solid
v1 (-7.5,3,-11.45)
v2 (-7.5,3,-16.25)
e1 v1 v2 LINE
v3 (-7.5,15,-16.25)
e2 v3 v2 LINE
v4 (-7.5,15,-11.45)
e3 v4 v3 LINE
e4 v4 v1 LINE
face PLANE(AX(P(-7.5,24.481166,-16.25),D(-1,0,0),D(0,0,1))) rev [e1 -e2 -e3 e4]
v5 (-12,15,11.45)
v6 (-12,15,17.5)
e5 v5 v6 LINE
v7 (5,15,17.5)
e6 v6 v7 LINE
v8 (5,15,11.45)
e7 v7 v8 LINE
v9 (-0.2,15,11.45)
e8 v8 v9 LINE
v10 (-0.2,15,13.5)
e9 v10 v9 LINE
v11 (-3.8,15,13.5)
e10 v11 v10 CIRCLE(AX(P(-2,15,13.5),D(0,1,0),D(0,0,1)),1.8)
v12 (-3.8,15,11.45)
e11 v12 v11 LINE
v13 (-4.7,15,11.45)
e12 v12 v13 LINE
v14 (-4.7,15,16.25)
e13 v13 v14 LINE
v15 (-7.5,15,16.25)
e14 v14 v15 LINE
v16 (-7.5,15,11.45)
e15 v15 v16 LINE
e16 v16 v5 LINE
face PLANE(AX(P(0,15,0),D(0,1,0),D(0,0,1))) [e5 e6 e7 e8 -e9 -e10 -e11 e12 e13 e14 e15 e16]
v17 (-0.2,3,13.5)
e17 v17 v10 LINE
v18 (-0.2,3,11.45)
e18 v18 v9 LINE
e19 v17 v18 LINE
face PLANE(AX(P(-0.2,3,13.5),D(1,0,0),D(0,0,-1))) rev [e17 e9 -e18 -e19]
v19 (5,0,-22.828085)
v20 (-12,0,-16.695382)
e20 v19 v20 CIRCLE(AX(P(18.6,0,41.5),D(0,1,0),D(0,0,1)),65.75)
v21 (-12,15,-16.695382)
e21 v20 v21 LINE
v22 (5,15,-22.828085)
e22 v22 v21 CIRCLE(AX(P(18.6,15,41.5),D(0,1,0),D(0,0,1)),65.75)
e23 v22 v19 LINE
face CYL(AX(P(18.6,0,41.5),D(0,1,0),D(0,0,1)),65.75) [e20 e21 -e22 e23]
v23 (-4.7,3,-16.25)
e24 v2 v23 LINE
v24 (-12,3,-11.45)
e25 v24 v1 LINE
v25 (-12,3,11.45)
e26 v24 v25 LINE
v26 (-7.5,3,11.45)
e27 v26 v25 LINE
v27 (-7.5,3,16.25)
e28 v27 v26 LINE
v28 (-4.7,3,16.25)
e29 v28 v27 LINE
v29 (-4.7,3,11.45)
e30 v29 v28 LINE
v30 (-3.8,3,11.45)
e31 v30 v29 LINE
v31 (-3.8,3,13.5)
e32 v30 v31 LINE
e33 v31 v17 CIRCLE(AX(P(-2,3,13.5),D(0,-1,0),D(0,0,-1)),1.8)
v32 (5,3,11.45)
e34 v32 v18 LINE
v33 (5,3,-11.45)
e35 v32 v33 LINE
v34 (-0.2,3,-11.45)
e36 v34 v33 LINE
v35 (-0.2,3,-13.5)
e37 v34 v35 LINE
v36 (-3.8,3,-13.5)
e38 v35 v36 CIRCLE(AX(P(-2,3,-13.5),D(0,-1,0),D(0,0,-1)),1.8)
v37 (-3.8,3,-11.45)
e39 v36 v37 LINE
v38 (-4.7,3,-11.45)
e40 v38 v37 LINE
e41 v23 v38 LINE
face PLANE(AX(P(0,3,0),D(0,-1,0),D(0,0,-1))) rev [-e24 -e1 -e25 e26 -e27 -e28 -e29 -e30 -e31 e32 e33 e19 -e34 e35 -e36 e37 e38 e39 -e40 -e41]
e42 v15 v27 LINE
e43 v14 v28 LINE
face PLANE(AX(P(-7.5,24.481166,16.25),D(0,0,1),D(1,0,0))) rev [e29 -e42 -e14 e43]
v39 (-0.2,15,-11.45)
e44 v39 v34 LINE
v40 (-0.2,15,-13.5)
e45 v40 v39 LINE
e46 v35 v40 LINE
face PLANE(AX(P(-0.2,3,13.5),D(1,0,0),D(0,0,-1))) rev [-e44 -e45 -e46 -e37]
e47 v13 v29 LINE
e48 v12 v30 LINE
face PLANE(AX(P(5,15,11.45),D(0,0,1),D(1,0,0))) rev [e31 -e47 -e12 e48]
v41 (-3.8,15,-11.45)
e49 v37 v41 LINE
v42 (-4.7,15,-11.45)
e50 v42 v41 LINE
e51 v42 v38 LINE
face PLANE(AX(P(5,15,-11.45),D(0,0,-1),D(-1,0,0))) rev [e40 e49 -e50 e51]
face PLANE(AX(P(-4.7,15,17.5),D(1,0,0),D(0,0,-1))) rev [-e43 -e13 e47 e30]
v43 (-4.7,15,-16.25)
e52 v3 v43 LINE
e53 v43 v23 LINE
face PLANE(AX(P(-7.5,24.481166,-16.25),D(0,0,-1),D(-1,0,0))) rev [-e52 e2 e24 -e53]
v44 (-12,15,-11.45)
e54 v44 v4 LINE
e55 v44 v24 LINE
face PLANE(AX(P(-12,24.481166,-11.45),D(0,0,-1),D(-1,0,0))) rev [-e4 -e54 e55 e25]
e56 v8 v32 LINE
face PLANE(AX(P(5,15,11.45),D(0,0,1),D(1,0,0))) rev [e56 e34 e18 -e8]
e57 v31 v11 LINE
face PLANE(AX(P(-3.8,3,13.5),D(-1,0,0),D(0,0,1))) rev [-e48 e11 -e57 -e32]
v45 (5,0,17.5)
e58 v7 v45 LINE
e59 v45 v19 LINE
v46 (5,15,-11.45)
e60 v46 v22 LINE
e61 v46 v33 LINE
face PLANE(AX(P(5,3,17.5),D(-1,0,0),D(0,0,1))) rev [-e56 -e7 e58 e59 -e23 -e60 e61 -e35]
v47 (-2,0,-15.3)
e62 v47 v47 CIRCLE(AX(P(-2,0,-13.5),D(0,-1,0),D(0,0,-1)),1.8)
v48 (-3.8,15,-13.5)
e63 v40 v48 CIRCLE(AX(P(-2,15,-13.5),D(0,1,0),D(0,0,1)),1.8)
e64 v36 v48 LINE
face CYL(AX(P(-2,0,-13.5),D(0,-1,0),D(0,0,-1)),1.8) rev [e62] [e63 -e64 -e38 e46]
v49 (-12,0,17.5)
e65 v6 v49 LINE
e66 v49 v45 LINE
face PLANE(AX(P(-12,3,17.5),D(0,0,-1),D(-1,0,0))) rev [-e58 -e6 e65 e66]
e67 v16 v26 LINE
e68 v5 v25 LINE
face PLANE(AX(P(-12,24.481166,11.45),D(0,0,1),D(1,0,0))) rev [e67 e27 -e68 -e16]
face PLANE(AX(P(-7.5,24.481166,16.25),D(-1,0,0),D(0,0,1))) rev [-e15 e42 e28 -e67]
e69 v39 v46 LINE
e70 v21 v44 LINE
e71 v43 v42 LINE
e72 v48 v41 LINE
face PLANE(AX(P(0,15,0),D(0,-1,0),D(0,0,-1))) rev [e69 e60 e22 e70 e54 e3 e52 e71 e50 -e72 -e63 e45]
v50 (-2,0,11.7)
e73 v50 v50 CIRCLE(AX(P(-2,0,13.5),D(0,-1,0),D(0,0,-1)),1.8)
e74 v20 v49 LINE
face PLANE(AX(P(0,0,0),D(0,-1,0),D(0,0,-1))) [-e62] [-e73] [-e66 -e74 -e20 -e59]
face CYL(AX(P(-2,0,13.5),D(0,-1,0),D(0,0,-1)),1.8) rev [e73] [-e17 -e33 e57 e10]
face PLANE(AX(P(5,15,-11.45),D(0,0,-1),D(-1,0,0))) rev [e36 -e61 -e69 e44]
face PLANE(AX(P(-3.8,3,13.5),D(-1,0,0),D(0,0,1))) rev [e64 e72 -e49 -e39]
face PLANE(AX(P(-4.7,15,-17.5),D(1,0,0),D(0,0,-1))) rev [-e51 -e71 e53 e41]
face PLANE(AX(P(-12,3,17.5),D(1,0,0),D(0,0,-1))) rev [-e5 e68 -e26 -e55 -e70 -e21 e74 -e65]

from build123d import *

# Parameters (mm, degrees)
SKETCH1_W            = 17
SKETCH1_H            = 35
BOSS_EXTRUDE1_DEPTH  = 3
M3_CLEARANCE_HOLE1_D = 3.6
SKETCH5_W            = 9.7
SKETCH5_H            = 6.05
BOSS_EXTRUDE2_DEPTH  = 12
CUT_EXTRUDE1_DEPTH   = 12
BOSS_EXTRUDE3_DEPTH  = 12
SKETCH8_W            = 17
SKETCH8_H            = 15
BOSS_EXTRUDE4_DEPTH  = 30
CUT_EXTRUDE2_START   = -15
CUT_EXTRUDE2_DEPTH   = 15


# Read off the part's stored shape, not the designer's step: Cut-Extrude2
with BuildPart() as part:
    # Sketch1 → Boss-Extrude1 (new body)
    with BuildSketch(Plane(origin=(0, 0, 0), x_dir=(1, 0, 0), z_dir=(0, 1, 0))):
        with Locations((-3.5, 0)):
            Rectangle(SKETCH1_W, SKETCH1_H)
    extrude(amount=BOSS_EXTRUDE1_DEPTH)

    # M3 Clearance Hole1 (through all)
    with Locations(Plane(origin=(0, 0, 0), x_dir=(-1, 0, 0), z_dir=(0, -1, 0))):
        with Locations((2, 13.5), (2, -13.5)):
            Hole(M3_CLEARANCE_HOLE1_D / 2)

    # Sketch5 → Boss-Extrude2 (add)
    with BuildSketch(Plane(origin=(0, 3, 0), x_dir=(1, 0, 0), z_dir=(0, 1, 0))):
        with Locations((0.15, -14.475)):
            Rectangle(SKETCH5_W, SKETCH5_H)
        with Locations((0.15, 14.475)):
            Rectangle(SKETCH5_W, SKETCH5_H)
    extrude(amount=BOSS_EXTRUDE2_DEPTH)

    # Sketch6 → Cut-Extrude1 (cut)
    with BuildSketch(Plane(origin=(0, 15, 0), x_dir=(1, 0, 0), z_dir=(0, 1, 0))):
        with BuildLine():
            Line((-3.8, -13.5), (-3.8, 13.5))
            ThreePointArc((-3.8, 13.5), (-2, 15.3), (-0.2, 13.5))
            Line((-0.2, 13.5), (-0.2, -13.5))
            ThreePointArc((-0.2, -13.5), (-2, -15.3), (-3.8, -13.5))
        make_face()
    extrude(amount=-CUT_EXTRUDE1_DEPTH, mode=Mode.SUBTRACT)

    # Sketch7 → Boss-Extrude3 (add)
    with BuildSketch(Plane(origin=(0, 3, 0), x_dir=(1, 0, 0), z_dir=(0, 1, 0))):
        Polygon((-12, -17.5), (-4.7, -17.5), (-4.7, -16.25), (-7.5, -16.25), (-7.5, -11.45), (-12, -11.45), align=None)
        Polygon((-12, 17.5), (-4.7, 17.5), (-4.7, 16.25), (-7.5, 16.25), (-7.5, 11.45), (-12, 11.45), align=None)
    extrude(amount=BOSS_EXTRUDE3_DEPTH)

    # Sketch8 → Boss-Extrude4 (add)
    with BuildSketch(Plane(origin=(0, 0, -17.5), x_dir=(-1, 0, 0), z_dir=(0, 0, -1))):
        with Locations((3.5, 7.5)):
            Rectangle(SKETCH8_W, SKETCH8_H)
    extrude(amount=BOSS_EXTRUDE4_DEPTH)

    # Cut-Extrude2 outline → Cut-Extrude2 (cut)
    with BuildSketch(Plane(origin=(0, 15, 0), x_dir=(1, 0, 0), z_dir=(0, 1, 0)).offset(CUT_EXTRUDE2_START)):
        with BuildLine():
            ThreePointArc((-12, 16.695382119), (-3.71171241, 20.348605395), (5, 22.828084846))
            Line((5, 22.828084846), (5, 47.5))
            Line((5, 47.5), (-12, 47.5))
            Line((-12, 47.5), (-12, 16.695382119))
        make_face()
    extrude(amount=CUT_EXTRUDE2_DEPTH, mode=Mode.SUBTRACT)


solid = part.part
